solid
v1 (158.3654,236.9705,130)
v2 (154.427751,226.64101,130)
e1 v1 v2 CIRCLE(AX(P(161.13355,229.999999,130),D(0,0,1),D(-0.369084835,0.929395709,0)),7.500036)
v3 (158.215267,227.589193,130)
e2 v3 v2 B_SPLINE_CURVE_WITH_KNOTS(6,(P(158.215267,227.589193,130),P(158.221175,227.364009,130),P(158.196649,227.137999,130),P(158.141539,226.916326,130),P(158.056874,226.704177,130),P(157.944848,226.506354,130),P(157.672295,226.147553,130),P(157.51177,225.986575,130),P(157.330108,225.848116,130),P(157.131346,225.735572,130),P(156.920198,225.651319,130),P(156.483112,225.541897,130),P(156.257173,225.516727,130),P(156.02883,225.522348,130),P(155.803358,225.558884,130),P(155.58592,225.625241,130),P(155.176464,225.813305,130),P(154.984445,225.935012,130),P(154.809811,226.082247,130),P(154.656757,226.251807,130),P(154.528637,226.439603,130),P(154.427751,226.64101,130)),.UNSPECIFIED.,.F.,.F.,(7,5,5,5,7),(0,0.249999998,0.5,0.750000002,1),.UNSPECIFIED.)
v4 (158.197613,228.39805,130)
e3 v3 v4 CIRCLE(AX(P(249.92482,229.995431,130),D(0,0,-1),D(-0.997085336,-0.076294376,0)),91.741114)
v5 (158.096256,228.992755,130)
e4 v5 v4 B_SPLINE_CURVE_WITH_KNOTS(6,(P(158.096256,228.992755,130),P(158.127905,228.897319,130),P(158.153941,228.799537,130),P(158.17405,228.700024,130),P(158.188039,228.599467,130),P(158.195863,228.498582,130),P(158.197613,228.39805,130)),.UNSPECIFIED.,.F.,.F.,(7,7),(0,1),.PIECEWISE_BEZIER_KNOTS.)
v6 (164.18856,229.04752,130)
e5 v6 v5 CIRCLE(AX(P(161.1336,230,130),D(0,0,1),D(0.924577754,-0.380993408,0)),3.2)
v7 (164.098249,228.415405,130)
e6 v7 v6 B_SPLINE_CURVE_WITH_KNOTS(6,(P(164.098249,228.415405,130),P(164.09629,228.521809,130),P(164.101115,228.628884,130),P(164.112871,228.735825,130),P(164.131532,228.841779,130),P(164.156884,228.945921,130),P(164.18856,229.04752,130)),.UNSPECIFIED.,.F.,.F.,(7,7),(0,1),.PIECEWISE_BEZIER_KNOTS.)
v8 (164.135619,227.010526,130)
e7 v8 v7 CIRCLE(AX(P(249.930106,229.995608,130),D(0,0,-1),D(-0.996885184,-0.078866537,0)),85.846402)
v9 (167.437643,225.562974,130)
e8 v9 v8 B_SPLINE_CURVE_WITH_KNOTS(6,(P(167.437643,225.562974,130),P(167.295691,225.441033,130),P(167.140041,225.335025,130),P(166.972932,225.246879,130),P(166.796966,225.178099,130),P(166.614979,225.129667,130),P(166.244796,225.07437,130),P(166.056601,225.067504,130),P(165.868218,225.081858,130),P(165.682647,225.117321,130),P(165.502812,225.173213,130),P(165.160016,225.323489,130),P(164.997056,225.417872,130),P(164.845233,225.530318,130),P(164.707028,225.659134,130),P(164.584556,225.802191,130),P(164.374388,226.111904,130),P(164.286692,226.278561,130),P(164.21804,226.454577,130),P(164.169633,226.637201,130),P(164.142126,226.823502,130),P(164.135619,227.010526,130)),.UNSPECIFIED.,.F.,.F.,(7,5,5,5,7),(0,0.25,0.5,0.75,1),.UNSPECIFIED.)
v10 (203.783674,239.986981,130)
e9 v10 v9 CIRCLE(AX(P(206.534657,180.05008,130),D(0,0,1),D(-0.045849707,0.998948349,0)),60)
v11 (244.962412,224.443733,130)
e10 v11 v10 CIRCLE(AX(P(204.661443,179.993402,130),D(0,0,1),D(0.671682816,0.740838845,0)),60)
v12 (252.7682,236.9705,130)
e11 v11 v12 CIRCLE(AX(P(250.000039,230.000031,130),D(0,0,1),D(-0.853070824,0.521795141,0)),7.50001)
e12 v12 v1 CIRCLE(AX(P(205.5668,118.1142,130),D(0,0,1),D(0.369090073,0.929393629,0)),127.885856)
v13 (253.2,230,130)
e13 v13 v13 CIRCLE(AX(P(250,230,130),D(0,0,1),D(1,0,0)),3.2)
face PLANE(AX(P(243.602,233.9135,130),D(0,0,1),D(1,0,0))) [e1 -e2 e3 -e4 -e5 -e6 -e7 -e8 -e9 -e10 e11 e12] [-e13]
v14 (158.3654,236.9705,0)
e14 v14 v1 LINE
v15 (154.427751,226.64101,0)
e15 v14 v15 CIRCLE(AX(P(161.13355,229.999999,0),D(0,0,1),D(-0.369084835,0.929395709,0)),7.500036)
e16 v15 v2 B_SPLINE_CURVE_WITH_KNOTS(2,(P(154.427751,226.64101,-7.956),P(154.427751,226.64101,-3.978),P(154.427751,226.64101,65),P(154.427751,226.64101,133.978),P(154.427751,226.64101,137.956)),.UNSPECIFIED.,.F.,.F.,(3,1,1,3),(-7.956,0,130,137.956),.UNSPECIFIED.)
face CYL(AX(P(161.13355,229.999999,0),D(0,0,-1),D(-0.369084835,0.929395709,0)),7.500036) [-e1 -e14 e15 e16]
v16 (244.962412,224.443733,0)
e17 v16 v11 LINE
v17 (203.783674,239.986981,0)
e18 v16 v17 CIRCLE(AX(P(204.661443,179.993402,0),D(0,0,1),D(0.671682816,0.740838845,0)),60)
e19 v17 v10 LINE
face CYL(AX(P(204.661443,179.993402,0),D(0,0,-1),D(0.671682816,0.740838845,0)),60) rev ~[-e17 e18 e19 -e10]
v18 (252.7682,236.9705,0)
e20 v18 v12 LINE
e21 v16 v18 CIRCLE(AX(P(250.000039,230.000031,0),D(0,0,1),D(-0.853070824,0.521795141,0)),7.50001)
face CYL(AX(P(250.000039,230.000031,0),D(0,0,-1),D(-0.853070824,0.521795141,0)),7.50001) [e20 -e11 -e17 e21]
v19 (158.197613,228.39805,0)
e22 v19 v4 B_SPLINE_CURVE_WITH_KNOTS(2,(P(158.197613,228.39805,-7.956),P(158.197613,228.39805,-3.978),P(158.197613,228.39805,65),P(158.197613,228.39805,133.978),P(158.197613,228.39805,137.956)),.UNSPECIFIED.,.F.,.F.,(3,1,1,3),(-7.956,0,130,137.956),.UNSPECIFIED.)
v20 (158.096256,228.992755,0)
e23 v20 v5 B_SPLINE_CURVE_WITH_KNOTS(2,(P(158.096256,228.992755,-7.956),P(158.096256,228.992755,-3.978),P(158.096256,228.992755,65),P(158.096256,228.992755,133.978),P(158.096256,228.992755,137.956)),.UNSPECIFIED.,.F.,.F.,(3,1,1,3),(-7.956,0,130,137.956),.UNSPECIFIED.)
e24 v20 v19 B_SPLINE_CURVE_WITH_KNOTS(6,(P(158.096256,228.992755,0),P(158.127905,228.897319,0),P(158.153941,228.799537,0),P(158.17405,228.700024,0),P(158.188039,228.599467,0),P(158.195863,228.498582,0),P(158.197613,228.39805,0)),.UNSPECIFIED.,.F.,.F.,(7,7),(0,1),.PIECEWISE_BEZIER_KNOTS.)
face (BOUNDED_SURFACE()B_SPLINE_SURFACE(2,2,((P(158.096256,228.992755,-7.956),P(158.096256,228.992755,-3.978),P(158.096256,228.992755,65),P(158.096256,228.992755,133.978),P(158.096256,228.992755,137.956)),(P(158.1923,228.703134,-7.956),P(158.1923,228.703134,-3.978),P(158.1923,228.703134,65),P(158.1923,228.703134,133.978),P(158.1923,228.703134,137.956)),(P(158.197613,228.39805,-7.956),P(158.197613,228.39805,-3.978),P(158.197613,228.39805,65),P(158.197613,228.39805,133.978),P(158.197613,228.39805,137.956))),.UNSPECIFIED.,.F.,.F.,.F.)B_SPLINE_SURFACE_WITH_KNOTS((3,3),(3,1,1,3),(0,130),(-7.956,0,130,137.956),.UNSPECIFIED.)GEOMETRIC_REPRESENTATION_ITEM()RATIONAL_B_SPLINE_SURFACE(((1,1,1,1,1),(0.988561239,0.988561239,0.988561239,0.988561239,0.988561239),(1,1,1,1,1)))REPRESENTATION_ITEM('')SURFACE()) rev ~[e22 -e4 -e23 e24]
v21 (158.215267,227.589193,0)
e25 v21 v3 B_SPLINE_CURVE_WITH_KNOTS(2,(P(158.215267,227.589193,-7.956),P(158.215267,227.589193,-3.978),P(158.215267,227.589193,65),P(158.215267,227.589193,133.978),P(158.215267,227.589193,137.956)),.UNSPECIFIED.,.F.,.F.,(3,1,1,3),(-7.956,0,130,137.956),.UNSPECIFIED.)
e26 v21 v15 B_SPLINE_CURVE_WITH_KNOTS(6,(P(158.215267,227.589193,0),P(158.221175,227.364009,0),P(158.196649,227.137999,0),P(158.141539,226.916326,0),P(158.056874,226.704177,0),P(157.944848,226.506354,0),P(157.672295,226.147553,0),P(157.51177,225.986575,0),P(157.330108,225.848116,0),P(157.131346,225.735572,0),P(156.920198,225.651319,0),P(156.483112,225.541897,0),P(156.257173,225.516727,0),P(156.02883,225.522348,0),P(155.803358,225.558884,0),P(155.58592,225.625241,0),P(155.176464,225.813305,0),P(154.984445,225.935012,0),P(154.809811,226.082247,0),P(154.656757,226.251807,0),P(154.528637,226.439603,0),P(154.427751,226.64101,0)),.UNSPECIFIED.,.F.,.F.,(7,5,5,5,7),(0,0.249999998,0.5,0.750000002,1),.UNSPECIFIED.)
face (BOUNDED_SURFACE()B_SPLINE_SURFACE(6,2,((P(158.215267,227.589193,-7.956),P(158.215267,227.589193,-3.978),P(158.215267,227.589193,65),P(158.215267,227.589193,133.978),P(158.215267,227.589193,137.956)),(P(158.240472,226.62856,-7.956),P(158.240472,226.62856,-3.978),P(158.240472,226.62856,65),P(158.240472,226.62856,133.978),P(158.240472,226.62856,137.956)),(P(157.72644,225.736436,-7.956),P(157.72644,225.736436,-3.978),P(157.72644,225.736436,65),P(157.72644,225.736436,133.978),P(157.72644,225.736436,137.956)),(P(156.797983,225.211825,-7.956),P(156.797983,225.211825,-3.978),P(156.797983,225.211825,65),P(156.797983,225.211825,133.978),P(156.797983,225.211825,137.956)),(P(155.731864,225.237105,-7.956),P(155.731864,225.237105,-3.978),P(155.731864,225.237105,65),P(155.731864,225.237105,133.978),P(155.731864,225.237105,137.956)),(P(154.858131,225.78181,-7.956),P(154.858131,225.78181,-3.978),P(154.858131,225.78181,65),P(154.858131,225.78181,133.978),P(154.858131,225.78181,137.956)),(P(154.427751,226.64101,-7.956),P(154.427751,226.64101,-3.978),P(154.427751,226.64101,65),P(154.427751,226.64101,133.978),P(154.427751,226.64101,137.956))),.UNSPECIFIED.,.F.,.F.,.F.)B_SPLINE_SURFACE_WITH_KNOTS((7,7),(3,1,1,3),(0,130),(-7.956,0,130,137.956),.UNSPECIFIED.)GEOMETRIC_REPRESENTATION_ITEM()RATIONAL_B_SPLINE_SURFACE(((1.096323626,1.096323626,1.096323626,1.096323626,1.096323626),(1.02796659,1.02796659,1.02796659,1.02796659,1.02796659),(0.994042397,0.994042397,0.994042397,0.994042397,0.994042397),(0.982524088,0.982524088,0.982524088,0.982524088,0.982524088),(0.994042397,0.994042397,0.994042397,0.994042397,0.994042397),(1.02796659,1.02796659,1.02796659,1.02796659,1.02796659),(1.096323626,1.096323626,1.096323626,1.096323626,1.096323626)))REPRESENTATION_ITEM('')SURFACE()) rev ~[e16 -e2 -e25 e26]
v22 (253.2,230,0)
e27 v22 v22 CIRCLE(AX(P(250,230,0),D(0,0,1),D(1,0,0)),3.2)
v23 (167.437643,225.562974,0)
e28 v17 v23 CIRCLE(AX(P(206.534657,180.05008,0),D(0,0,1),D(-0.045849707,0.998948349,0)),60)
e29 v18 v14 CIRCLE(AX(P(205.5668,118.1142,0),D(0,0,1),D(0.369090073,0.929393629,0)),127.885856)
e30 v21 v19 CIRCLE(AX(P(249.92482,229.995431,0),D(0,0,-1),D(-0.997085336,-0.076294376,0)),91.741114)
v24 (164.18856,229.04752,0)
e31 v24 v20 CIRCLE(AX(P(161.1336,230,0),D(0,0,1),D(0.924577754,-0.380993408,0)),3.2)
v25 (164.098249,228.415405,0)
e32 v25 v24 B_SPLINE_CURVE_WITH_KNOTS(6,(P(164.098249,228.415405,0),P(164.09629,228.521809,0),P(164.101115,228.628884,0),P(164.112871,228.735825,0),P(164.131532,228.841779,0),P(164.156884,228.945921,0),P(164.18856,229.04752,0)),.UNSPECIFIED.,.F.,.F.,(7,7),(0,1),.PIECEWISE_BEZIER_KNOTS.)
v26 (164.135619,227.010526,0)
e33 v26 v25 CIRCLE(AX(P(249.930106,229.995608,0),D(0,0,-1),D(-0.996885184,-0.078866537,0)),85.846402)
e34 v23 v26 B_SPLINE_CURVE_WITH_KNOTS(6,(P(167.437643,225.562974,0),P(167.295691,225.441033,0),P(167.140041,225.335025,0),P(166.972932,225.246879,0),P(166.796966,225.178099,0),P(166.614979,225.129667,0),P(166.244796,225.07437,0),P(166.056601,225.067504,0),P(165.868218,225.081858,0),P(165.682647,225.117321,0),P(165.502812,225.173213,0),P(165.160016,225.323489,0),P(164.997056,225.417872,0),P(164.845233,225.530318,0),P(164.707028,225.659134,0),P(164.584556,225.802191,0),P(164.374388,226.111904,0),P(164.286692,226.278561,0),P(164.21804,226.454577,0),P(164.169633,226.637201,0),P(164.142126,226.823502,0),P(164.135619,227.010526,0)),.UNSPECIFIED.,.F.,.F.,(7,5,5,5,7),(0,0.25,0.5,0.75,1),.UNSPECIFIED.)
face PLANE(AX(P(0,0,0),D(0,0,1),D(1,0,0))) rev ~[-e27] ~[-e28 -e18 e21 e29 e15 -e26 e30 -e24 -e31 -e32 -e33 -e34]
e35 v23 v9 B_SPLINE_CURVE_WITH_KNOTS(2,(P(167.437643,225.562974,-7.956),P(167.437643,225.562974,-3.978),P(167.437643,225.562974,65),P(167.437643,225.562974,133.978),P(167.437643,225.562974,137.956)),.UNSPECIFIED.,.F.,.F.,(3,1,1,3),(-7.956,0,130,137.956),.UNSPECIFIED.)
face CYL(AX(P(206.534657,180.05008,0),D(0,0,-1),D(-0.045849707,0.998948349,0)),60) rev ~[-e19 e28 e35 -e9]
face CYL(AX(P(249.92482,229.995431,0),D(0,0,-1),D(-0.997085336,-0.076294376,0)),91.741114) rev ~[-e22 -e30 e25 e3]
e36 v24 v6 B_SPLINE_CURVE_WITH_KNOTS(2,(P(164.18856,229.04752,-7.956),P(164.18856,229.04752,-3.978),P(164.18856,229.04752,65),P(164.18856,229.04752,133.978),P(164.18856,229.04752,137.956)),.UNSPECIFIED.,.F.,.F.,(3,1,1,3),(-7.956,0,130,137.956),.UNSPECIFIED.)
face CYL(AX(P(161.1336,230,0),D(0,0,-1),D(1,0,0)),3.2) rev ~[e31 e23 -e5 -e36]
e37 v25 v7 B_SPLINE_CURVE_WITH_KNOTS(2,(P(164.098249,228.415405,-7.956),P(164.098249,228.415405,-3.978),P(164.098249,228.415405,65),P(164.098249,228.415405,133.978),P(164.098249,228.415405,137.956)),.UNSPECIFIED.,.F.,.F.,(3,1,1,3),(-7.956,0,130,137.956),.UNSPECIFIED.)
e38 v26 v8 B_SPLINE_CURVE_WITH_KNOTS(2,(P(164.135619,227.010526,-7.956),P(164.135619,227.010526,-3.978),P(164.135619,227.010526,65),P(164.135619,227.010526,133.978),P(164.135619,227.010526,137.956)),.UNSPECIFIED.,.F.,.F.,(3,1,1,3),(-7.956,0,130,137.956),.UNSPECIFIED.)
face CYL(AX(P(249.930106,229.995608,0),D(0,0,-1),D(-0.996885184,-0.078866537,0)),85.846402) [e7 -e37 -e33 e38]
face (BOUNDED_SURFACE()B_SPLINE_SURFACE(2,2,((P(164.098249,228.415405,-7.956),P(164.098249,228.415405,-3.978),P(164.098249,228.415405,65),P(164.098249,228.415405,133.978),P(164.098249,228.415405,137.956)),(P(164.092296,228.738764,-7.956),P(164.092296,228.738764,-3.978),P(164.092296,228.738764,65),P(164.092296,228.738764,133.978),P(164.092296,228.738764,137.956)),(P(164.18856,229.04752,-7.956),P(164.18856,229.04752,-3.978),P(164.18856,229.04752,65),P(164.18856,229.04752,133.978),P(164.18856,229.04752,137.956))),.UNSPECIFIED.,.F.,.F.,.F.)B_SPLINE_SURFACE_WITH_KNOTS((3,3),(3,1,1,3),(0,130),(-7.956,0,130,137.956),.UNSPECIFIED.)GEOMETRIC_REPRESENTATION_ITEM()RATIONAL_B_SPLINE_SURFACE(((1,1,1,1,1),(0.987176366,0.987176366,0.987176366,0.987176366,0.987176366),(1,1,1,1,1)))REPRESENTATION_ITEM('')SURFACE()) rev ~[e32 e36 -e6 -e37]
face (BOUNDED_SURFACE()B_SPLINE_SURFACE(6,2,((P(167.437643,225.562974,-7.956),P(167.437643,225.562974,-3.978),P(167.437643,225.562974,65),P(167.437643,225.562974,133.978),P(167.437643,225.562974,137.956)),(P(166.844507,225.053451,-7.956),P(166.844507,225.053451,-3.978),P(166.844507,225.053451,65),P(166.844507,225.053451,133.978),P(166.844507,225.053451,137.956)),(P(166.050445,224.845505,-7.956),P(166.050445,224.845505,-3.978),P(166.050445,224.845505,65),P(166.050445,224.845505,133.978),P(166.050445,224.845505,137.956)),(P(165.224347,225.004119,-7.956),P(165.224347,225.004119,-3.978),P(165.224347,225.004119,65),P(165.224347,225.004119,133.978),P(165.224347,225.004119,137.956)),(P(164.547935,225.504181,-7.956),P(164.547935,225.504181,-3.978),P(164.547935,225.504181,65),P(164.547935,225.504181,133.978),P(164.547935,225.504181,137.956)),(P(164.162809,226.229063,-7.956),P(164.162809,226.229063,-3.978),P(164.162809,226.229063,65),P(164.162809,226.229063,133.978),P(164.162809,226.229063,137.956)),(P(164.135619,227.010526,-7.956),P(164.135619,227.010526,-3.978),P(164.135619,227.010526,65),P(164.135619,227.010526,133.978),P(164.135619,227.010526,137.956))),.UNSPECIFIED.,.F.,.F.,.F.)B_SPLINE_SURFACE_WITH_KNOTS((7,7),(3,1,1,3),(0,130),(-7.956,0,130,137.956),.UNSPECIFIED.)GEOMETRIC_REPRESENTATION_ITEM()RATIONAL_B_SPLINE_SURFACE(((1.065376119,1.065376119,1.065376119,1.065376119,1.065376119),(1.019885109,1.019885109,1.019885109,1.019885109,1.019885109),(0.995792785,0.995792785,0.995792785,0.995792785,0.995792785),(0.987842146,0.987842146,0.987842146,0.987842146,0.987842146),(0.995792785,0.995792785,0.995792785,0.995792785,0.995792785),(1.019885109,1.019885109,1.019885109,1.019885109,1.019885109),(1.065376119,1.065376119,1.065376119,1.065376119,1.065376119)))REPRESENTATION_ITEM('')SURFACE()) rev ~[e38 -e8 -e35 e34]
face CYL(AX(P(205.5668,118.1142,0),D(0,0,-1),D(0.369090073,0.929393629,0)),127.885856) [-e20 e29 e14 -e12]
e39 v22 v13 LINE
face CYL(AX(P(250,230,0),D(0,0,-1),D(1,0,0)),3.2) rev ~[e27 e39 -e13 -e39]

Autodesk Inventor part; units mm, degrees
ref_plane "YZ Plane" through (0, 0, 0) normal (1, 0, 0) x (0, 1, 0)
ref_plane "XZ Plane" through (0, 0, 0) normal (0, 1, 0) x (-1, 0, 0)
ref_plane "XY Plane" through (0, 0, 0) normal (0, 0, 1) x (1, 0, 0)
ref_plane "作業平面1" through (0, 0, 0) normal (0, 0, 1) x (1, 0, 0)
sketch "スケッチ1" plane through (0, 0, 0) normal (0, 0, 1) x (1, 0, 0)
  circle A0 centre (250, 230) radius 3 construction
  line L0 (246.124, 222.5) -> (255, 222.5) construction
  circle A1 centre (239, 219) radius 3 construction
  circle A2 centre (161.1336, 230) radius 3 construction
  arc A3 (-159.3342, 234.665) -> (159.3342, 234.665) centre (0, 647.734) ccw construction
  line L1 (250, 235) -> (161.1336, 235) construction
  circle A4 centre (250, 230) radius 3.2
  circle A5 centre (161.1336, 230) radius 3.2
  circle A6 centre (250, 230) radius 7.5 construction
  circle A7 centre (161.1336, 230) radius 7.5 construction
  line L2 (250, 230) -> (161.1336, 230) construction
  line L3 (205.5668, 230) -> (205.5668, 246) construction
  arc A8 (252.7682, 236.9705) -> (158.3654, 236.9705) centre (205.5668, 118.1142) ccw
  arc A9 (243.602, 233.9135) -> (167.5316, 233.9135) centre (205.5668, 118.1142) ccw
  arc A10 (243.602, 233.9135) -> (252.7682, 236.9705) centre (250, 230) ccw
  arc A11 (158.3654, 236.9705) -> (167.5316, 233.9135) centre (161.1336, 230) ccw
  point P0 (0, 0)
  dimension "d0" = 6.4
  dimension "d1" = 15
  dimension "d2" = 16
  dimension "d3" = 6
extrude "押し出し1" add sketch "スケッチ1" along normal blind 130
fillet "フィレット1" radius 60 2 edges at (243.602, 233.9135, 65) (167.5316, 233.9135, 65)
sketch "スケッチ2" plane through (0, 0, 0) normal (0, 0, -1) x (-1, 0, 0)
  arc A0 (-166.1782, 224.45) -> (-158.3654, 236.9705) centre (-161.1336, 230) ccw projected
  circle A1 centre (-161.1336, 230) radius 3.2 projected
  circle A2 centre (-250, 230) radius 3.2 projected
  circle A3 centre (-250, 230) radius 88.8664 construction
  arc A4 (-158.4511, 222.9961) -> (-158.1923, 228.7397) centre (-250, 230) ccw
  arc A5 (-164.3511, 223.2252) -> (-164.0923, 228.7808) centre (-250, 230) ccw
  point P0 (0, 0)
  dimension "d7" = 2.95
  dimension "d8" = 2.95
extrude "押し出し2" cut sketch "スケッチ2" against normal through all contours A5 A1 A4 A0
fillet "フィレット2" radius 2 4 edges at (158.4511, 222.9961, 65) (164.3511, 223.2252, 65) (164.0923, 228.7808, 65) (158.1923, 228.7397, 65)
equation "\"d8\" = d7"
properties part number "foot_01"
